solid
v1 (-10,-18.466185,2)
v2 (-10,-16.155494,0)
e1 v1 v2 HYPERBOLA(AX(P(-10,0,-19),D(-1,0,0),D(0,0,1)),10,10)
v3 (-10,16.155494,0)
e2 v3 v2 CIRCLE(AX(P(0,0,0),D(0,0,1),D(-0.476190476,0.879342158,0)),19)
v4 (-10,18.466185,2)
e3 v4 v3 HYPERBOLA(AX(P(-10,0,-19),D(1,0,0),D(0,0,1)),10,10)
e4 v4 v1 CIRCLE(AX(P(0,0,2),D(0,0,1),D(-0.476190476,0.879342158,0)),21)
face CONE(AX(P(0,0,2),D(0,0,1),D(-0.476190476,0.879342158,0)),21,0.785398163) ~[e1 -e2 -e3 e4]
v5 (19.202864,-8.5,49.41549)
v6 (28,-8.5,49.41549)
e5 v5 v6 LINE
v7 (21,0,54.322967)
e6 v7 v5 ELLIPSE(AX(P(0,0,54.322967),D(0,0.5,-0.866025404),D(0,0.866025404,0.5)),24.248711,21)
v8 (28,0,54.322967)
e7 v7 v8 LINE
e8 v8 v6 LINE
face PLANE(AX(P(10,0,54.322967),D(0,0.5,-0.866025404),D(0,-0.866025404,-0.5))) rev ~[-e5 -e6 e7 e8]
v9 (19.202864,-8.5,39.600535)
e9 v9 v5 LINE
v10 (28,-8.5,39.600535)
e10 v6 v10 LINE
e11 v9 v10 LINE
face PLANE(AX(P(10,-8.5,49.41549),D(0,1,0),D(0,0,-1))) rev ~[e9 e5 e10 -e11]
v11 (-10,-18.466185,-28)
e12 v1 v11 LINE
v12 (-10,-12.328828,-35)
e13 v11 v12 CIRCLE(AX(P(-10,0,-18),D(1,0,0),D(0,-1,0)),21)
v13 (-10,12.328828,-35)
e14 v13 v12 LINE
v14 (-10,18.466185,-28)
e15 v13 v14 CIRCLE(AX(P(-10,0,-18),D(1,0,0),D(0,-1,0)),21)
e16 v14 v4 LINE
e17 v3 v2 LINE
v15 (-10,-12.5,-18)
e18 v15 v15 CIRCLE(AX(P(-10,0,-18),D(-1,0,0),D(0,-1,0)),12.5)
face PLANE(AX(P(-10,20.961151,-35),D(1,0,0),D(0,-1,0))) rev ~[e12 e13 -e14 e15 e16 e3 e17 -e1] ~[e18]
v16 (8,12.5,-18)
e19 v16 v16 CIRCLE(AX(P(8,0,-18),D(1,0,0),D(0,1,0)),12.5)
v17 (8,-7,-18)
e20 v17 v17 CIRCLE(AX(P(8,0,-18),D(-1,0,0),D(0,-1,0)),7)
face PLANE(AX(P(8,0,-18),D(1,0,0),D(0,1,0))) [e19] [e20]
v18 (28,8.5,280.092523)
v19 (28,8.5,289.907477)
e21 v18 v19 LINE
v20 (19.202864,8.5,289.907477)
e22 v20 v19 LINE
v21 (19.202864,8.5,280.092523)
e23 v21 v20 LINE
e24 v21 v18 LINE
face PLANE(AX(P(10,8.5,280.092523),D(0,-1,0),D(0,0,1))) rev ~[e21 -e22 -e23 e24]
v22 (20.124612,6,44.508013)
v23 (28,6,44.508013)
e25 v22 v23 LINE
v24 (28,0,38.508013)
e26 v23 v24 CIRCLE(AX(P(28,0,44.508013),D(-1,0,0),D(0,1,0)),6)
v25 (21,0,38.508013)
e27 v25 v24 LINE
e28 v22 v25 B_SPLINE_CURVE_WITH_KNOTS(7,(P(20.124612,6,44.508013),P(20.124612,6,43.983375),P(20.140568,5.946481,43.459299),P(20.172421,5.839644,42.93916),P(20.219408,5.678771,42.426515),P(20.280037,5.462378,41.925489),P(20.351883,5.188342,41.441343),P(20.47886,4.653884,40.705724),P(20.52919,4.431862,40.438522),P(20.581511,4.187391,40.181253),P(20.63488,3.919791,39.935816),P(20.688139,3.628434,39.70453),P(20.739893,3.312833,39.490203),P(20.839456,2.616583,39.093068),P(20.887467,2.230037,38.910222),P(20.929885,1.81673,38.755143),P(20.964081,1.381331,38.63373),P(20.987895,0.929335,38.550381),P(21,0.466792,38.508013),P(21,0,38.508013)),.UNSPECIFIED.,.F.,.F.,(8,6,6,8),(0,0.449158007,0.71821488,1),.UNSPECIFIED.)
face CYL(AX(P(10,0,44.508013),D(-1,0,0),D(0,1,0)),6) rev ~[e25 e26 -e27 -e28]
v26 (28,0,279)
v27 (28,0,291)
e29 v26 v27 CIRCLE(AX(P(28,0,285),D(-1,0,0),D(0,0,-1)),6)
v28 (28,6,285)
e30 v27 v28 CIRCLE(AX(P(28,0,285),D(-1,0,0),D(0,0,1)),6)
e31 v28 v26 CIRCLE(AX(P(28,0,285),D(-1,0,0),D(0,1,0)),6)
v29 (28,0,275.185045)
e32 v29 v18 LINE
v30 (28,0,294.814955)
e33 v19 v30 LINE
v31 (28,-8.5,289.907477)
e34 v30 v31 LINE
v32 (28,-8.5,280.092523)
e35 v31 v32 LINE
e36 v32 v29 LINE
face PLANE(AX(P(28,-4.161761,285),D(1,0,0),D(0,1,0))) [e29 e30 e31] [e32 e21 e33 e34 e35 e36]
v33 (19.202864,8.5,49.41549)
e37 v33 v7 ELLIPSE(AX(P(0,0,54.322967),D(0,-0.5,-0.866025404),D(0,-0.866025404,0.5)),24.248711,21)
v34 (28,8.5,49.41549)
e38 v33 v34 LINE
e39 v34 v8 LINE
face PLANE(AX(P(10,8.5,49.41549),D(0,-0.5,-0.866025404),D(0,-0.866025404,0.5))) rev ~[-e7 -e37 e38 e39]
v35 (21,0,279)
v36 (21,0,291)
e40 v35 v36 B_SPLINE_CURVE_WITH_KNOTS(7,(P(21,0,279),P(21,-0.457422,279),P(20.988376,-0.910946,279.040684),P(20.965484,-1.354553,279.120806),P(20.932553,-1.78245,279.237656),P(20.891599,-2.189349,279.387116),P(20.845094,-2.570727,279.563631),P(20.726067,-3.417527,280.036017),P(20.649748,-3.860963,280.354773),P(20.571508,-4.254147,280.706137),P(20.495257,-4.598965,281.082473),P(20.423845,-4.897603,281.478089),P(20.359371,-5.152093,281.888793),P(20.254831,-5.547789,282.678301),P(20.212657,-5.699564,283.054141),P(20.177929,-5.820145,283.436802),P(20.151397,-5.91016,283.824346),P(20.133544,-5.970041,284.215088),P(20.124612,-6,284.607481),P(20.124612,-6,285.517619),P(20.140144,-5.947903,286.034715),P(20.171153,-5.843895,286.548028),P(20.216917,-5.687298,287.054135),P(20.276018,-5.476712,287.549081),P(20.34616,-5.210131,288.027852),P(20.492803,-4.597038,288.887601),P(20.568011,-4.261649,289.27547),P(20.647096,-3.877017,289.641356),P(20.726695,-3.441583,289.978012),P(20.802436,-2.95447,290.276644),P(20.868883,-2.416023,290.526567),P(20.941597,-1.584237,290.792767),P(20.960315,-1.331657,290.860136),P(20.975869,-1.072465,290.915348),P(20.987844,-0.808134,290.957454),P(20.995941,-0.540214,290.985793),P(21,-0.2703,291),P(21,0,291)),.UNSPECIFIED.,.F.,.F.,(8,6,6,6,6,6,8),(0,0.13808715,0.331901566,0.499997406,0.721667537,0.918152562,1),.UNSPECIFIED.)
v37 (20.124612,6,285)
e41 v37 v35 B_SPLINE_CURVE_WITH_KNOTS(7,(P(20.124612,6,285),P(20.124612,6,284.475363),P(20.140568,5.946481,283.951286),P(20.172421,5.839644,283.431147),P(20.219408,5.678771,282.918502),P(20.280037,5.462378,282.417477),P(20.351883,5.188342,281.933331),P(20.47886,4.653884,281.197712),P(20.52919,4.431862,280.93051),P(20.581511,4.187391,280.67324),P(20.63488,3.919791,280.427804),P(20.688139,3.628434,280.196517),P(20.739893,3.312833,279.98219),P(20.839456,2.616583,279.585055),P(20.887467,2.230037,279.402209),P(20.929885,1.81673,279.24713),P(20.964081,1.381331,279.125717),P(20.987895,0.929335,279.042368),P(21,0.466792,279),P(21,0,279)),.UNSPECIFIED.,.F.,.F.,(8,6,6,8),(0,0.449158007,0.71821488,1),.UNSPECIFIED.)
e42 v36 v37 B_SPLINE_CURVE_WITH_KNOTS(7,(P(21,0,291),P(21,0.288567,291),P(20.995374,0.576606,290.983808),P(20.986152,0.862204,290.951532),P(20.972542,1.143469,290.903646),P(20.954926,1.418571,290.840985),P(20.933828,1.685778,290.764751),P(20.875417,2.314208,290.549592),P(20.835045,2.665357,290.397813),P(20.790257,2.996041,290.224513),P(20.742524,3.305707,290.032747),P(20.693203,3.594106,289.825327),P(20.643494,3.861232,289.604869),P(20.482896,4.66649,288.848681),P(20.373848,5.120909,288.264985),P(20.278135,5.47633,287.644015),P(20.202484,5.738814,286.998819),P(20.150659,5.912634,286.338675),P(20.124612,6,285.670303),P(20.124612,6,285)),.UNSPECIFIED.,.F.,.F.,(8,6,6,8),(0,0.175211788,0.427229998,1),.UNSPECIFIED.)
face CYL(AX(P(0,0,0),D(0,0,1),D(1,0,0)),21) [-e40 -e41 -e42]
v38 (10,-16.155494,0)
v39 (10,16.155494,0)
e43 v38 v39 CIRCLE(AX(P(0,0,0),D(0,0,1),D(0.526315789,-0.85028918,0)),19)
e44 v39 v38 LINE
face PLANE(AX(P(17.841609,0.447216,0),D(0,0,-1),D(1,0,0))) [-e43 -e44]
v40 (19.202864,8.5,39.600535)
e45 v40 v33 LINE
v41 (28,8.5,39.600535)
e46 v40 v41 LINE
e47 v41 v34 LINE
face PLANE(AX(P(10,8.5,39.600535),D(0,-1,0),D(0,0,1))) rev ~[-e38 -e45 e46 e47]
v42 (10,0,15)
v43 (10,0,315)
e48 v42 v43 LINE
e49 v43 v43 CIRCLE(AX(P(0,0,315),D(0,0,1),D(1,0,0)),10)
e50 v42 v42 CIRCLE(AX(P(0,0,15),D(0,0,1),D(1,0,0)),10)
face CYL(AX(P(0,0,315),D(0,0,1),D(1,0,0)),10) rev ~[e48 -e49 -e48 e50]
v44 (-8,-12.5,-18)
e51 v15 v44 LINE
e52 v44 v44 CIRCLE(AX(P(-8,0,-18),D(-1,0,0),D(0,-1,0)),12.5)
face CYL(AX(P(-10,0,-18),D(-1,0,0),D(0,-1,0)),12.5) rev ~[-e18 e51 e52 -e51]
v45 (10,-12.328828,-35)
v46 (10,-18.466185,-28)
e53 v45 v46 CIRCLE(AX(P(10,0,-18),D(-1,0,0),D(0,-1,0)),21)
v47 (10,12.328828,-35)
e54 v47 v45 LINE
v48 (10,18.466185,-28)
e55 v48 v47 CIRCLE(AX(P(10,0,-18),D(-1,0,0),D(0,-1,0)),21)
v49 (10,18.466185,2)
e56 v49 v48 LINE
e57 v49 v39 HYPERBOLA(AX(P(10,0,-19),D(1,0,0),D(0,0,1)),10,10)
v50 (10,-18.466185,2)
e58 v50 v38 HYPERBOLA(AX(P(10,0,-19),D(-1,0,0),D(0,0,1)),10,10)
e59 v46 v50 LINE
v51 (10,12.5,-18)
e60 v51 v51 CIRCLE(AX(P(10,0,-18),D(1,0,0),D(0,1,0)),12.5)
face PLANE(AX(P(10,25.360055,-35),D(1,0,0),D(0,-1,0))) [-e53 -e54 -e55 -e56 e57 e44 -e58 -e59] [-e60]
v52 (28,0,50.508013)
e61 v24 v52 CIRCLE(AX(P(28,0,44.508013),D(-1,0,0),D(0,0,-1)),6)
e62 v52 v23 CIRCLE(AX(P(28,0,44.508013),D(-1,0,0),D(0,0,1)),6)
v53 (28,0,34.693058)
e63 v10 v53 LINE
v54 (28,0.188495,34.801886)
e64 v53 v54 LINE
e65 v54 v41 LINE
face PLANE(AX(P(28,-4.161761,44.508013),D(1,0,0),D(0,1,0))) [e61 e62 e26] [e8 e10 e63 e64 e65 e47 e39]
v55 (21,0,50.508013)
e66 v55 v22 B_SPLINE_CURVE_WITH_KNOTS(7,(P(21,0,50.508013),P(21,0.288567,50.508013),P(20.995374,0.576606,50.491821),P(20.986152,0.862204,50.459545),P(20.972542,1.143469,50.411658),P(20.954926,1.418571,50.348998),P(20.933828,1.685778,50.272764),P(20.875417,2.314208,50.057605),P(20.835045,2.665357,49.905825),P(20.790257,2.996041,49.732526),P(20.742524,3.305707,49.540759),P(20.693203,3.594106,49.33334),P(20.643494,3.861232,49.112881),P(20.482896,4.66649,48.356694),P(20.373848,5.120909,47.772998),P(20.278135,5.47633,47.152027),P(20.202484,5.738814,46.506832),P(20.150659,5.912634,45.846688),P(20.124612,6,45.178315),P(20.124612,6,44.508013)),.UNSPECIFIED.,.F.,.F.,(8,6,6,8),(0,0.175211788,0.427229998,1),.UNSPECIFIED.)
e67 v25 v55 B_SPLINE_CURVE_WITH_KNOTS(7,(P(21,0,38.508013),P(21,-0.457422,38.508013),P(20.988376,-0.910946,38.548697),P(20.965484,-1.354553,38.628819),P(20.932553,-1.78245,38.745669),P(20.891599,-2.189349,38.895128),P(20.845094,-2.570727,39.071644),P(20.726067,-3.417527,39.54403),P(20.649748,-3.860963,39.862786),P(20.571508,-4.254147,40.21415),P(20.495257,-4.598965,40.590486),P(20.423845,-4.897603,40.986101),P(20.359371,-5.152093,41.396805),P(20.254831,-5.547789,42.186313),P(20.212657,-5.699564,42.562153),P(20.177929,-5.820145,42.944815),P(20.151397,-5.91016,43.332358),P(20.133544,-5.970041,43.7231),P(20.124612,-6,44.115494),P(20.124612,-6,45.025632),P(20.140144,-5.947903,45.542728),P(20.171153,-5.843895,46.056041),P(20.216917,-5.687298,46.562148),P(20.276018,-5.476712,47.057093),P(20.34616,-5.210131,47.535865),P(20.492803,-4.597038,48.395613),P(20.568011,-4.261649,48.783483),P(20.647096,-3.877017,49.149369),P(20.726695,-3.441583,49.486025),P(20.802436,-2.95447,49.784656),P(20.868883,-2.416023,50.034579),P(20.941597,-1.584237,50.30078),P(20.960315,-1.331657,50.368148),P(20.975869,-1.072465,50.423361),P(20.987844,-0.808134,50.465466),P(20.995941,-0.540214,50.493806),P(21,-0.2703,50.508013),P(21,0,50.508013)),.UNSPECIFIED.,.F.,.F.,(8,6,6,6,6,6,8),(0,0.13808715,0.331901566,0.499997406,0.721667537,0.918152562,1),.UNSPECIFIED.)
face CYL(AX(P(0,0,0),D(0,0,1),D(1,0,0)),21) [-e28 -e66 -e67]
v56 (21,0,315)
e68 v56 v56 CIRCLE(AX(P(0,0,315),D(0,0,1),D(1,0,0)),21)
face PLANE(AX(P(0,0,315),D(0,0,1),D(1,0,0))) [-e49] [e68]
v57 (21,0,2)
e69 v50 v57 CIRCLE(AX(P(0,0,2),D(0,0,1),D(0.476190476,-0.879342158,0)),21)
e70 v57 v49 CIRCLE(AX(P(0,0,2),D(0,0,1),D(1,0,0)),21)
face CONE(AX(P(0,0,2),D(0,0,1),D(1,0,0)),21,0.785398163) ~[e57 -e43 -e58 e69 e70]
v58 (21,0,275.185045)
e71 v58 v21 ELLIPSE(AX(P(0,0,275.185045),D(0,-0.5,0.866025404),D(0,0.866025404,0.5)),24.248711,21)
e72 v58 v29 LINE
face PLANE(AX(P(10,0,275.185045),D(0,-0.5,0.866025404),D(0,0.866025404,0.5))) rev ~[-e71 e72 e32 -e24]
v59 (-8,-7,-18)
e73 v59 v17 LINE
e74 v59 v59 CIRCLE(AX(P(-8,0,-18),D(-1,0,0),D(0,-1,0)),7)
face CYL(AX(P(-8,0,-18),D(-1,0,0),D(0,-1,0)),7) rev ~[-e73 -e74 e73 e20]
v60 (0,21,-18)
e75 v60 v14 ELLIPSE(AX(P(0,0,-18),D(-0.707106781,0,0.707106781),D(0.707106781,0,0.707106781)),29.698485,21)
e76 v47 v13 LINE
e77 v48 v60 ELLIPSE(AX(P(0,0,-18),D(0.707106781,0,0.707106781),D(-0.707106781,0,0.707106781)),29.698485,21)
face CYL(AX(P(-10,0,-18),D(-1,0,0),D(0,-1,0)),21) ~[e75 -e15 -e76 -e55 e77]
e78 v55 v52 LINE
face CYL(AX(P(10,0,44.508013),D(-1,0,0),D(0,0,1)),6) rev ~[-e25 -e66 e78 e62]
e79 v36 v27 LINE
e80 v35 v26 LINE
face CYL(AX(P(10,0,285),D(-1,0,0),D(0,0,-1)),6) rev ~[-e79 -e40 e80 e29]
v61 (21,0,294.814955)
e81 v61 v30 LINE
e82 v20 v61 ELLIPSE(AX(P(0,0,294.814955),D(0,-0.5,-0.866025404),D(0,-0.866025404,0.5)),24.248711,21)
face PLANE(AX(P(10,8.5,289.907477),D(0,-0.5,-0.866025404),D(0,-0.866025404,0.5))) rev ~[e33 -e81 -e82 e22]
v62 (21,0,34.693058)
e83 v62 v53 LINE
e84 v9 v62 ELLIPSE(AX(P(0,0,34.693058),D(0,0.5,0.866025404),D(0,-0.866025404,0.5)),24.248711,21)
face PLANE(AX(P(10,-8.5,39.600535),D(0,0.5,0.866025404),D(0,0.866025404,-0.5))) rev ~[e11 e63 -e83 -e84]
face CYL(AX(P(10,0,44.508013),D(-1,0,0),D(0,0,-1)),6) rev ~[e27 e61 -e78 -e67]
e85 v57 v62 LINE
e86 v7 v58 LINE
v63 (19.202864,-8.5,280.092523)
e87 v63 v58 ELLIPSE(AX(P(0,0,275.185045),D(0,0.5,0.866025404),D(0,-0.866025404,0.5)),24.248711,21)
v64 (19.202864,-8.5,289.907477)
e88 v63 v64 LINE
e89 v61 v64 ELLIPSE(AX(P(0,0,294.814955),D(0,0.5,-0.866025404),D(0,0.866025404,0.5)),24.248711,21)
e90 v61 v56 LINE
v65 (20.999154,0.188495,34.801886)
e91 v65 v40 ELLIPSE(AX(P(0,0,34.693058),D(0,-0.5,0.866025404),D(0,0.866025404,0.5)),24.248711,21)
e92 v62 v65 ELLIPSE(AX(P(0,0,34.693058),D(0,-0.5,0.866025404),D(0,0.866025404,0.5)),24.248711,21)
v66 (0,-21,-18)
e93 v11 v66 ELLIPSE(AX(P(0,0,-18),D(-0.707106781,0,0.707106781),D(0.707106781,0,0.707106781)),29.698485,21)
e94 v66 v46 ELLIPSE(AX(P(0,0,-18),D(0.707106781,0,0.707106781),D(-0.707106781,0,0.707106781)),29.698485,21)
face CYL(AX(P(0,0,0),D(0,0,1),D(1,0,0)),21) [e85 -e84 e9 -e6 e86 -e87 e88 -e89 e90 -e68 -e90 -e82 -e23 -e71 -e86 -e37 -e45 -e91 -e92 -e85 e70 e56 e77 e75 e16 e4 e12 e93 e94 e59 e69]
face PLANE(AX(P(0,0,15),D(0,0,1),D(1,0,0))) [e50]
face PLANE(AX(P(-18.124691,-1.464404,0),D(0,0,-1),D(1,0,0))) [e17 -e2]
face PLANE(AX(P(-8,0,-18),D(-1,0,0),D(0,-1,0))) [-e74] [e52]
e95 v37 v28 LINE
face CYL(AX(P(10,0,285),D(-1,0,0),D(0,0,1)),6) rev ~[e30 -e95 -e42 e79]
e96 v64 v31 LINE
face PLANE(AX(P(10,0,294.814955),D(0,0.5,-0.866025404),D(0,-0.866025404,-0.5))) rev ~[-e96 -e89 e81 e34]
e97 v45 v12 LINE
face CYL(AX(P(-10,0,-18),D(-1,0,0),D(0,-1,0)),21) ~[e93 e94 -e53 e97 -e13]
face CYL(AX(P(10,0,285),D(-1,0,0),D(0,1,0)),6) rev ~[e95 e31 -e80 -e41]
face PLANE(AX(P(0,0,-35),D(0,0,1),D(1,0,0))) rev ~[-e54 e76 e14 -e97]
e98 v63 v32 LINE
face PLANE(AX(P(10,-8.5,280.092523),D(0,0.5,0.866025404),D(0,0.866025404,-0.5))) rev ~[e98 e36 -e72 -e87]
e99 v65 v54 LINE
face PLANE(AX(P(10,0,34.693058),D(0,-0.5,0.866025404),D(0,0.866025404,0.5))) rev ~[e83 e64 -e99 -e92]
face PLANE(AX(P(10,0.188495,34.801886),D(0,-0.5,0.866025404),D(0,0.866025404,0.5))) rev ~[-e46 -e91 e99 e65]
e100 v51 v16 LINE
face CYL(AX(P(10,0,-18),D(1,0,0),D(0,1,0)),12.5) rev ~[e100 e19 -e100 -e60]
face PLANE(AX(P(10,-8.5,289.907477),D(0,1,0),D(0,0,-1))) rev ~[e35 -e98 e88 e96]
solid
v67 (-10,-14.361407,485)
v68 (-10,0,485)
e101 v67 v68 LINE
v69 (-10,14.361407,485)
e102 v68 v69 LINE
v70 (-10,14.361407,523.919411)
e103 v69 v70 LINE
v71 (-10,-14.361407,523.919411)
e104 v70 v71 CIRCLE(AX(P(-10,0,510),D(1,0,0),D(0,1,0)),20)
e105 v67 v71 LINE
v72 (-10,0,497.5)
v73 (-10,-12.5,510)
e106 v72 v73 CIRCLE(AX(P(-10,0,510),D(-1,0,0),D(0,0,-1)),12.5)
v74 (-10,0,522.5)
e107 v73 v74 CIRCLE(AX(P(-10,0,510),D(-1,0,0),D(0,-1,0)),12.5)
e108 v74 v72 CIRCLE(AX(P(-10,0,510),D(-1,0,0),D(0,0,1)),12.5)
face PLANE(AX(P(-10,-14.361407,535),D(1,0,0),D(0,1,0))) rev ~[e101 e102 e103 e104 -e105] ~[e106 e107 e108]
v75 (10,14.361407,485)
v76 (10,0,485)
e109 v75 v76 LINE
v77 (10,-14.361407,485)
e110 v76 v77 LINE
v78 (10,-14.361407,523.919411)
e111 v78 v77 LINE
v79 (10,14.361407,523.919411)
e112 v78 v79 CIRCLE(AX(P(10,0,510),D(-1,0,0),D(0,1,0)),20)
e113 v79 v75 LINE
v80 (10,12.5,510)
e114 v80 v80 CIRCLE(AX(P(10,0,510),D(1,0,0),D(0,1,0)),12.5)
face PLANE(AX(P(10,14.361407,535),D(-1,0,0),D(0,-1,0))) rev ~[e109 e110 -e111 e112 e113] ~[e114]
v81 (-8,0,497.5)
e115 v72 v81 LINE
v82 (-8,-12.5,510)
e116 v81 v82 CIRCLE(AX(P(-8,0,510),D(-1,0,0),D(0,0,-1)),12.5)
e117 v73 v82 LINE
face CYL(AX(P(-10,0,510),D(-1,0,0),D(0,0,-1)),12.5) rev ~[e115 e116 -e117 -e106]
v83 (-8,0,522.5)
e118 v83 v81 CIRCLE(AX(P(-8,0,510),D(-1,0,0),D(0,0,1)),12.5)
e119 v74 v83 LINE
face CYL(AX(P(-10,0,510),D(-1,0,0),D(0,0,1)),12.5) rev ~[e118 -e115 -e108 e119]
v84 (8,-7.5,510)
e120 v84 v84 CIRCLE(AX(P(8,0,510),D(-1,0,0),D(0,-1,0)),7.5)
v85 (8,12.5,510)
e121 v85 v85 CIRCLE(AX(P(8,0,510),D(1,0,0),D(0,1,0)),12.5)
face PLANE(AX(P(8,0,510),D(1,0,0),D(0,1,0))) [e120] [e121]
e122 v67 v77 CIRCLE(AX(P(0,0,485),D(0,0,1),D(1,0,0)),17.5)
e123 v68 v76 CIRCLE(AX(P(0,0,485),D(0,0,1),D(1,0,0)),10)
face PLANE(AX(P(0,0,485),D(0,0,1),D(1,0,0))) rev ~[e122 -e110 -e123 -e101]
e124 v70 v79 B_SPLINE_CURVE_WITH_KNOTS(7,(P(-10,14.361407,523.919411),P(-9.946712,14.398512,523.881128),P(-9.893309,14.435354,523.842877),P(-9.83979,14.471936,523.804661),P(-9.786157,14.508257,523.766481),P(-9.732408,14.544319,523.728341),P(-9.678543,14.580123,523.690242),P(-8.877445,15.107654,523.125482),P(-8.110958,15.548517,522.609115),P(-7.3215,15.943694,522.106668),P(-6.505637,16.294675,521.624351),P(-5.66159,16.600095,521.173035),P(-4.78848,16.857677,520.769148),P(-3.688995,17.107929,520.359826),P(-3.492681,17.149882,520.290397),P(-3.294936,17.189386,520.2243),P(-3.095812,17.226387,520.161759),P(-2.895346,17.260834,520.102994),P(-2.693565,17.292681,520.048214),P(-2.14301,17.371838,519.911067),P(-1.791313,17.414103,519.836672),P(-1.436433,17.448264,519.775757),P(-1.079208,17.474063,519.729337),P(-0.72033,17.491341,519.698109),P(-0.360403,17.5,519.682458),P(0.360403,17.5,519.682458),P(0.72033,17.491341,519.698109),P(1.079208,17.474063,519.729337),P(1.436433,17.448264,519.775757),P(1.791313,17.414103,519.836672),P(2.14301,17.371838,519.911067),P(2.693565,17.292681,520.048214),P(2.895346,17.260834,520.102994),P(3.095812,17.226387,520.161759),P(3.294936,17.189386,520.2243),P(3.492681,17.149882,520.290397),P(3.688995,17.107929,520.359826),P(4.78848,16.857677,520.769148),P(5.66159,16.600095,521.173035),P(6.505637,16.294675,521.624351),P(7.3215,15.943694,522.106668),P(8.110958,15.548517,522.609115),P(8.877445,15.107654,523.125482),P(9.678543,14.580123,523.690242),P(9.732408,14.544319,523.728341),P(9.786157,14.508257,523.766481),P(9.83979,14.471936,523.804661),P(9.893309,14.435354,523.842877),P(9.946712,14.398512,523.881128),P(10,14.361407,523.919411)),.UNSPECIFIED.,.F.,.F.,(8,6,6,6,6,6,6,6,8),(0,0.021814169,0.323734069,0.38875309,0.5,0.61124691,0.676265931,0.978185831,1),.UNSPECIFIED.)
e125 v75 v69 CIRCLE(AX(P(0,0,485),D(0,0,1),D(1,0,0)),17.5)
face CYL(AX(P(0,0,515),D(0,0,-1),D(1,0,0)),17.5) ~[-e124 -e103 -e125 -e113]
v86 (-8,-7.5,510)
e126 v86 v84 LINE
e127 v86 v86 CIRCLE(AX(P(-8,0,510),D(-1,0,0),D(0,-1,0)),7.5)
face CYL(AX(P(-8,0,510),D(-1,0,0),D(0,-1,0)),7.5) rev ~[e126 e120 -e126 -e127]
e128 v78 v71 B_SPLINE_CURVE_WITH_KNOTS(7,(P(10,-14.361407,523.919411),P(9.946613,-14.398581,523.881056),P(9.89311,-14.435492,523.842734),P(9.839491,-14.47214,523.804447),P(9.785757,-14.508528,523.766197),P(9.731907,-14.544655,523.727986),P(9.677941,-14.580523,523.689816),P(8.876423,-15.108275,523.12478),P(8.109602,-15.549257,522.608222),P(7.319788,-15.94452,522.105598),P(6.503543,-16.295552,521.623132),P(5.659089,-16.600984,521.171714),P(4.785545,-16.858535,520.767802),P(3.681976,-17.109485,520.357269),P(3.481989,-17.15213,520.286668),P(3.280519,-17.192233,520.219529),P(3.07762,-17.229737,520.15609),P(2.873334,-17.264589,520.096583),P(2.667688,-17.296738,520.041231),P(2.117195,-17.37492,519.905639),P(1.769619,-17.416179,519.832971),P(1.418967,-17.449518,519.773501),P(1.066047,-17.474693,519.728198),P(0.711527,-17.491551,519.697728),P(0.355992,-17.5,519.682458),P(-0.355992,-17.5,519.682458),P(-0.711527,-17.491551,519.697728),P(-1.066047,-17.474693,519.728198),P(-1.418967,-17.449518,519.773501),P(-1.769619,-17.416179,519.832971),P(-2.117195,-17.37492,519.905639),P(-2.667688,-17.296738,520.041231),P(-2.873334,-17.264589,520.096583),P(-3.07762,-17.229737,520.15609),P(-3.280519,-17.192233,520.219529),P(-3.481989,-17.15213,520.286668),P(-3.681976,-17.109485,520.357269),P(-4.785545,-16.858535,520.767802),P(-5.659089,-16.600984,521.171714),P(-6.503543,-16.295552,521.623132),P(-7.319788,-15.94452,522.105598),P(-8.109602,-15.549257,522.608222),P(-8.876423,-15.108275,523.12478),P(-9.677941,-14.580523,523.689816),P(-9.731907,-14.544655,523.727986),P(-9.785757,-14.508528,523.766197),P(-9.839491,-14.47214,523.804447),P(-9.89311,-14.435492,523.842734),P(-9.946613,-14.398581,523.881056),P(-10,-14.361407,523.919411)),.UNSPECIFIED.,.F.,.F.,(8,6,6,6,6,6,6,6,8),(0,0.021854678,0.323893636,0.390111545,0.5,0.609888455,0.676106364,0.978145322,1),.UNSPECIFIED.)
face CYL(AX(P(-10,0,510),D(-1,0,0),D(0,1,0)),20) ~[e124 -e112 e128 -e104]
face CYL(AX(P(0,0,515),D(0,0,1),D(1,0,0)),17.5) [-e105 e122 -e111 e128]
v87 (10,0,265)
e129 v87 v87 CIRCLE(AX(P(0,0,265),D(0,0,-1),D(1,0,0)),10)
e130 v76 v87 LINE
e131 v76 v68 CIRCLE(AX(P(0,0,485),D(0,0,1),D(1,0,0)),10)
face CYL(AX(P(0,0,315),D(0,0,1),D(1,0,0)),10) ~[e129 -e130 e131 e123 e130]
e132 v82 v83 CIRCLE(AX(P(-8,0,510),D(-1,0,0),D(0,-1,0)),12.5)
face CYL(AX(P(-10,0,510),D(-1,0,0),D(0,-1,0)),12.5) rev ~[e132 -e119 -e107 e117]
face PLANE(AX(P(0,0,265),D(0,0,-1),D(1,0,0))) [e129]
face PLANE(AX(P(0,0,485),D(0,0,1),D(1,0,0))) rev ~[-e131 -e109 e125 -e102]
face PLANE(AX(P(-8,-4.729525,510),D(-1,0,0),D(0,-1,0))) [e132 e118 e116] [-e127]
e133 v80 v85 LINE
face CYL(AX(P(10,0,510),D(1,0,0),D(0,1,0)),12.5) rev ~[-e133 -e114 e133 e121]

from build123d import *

# Parameters (mm, degrees)
F0_R      = 21
F1_DEPTH  = 315
F2_R      = 10
F3_DEPTH  = 300
F4_R      = 21
F5_DEPTH  = 35
F6_W      = 15.6832183711
F6_H      = 49.8256795108
F6_W_2    = 16.2493828684
F6_H_2    = 44.8511093855
F7_DEPTH  = 35
F8_R      = 12.5
F9_DEPTH  = 2
F10_R     = 7
F11_DEPTH = 25
F12_R     = 12.5
F13_DEPTH = 2
F15_DEPTH = 25
F16_SIZE  = 2
F17_R     = 10
F18_DEPTH = 200
F19_R     = 10
F20_DEPTH = 50
F21_R     = 17.5
F21_R_2   = 10
F22_DEPTH = 30
F23_R     = 17.5
F24_DEPTH = 20
F26_DEPTH = 60
F28_DEPTH = 2
F29_R     = 7.5
F30_DEPTH = 25
F31_R     = 12.5
F31_R_2   = 7.5
F32_DEPTH = 2
F34_DEPTH = 25
F36_DEPTH = 18


with BuildPart() as f1:
    # F0 (on Top) → F1 (new body)
    with BuildSketch(Plane.XY):
        Circle(F0_R)
    extrude(amount=F1_DEPTH)

    # F2 (on face) → F3 (cut)
    with BuildSketch(Plane.XY.offset(315)):
        Circle(F2_R)
    extrude(amount=-F3_DEPTH, mode=Mode.SUBTRACT)

    # F4 (on face) → F5 (join)
    with BuildSketch(Plane.XY):
        Circle(F4_R)
    extrude(amount=-F5_DEPTH)

    # F6 (on face) → F7 (cut)
    with BuildSketch(Plane(origin=(0, 0, -35), x_dir=(1, 0, 0), z_dir=(0, 0, -1))):
        with Locations((17.8416091856, -0.4472155124)):
            Rectangle(F6_W, F6_H)
        with Locations((-18.1246914342, 1.4644041657)):
            Rectangle(F6_W_2, F6_H_2)
    extrude(amount=-F7_DEPTH, mode=Mode.SUBTRACT)

    # F8 (on face) → F9 (cut)
    with BuildSketch(Plane(origin=(-10, 0, 0), x_dir=(0, -1, 0), z_dir=(-1, 0, 0))):
        with Locations((0, -18)):
            Circle(F8_R)
    extrude(amount=-F9_DEPTH, mode=Mode.SUBTRACT)

    # F10 (on face) → F11 (cut)
    with BuildSketch(Plane(origin=(-8, 0, 0), x_dir=(0, -1, 0), z_dir=(-1, 0, 0))):
        with Locations((0, -18)):
            Circle(F10_R)
    extrude(amount=-F11_DEPTH, mode=Mode.SUBTRACT)

    # F12 (on face) → F13 (cut)
    with BuildSketch(Plane.YZ.offset(10)):
        with Locations((0, -18)):
            Circle(F12_R)
    extrude(amount=-F13_DEPTH, mode=Mode.SUBTRACT)

    # F14 (on face) → F15 (cut)
    with BuildSketch(Plane(origin=(-10, 0, 0), x_dir=(0, -1, 0), z_dir=(-1, 0, 0))):
        with BuildLine():
            ThreePointArc((21, -18), (0, -39), (-21, -18))
            Line((-21, -18), (-30, -18))
            ThreePointArc((-30, -18), (0, -48), (30, -18))
            Line((30, -18), (21, -18))
        make_face()
    extrude(amount=-F15_DEPTH, mode=Mode.SUBTRACT)

    # F16
    f16_edges = [f1.edges().sort_by_distance(p)[0] for p in [
        (18.041619, 10.747093, 0),
        (18.041619, -10.747093, 0),
        (-21, 0, 0),
    ]]
    chamfer(f16_edges, length=F16_SIZE)

    # F35 (on face) → F36 (join)
    with BuildSketch(Plane.YZ.offset(10)):
        with BuildLine():
            Line((0, 50.508012673), (0, 54.3229672492))
            Line((0, 54.3229672492), (-8.5, 49.4154899611))
            Line((-8.5, 49.4154899611), (-8.5, 39.6005353849))
            Line((-8.5, 39.6005353849), (0, 34.6930580967))
            Line((0, 34.6930580967), (0, 38.508012673))
            ThreePointArc((0, 38.508012673), (-6, 44.508012673), (0, 50.508012673))
        make_face()
        with BuildLine():
            Line((-8.5, 280.0925227119), (0, 275.1850454238))
            Line((0, 275.1850454238), (0, 279))
            ThreePointArc((0, 279), (-6, 285), (0, 291))
            Line((0, 291), (0, 294.8149545762))
            Line((0, 294.8149545762), (-8.5, 289.9074772881))
            Line((-8.5, 289.9074772881), (-8.5, 280.0925227119))
        make_face()
        with BuildLine():
            Line((0, 279), (0, 275.1850454238))
            Line((0, 275.1850454238), (8.5, 280.0925227119))
            Line((8.5, 280.0925227119), (8.5, 289.9074772881))
            Line((8.5, 289.9074772881), (0, 294.8149545762))
            Line((0, 294.8149545762), (0, 291))
            ThreePointArc((0, 291), (4.2426406871, 289.2426406871), (6, 285))
            ThreePointArc((6, 285), (4.2426406871, 280.7573593129), (0, 279))
        make_face()
        with BuildLine():
            Line((8.5, 49.4154899611), (0, 54.3229672492))
            Line((0, 54.3229672492), (0, 50.508012673))
            ThreePointArc((0, 50.508012673), (4.2426406871, 48.7506533601), (6, 44.508012673))
            ThreePointArc((6, 44.508012673), (4.2426406871, 40.2653719858), (0, 38.508012673))
            Line((0, 38.508012673), (0, 34.6930580967))
            Line((0, 34.6930580967), (0.1884949477, 34.8018857055))
            Line((0.1884949477, 34.8018857055), (8.5, 39.6005353849))
            Line((8.5, 39.6005353849), (8.5, 49.4154899611))
        make_face()
    extrude(amount=F36_DEPTH)


with BuildPart() as f18:
    # F17 (on face) → F18 (new body)
    with BuildSketch(Plane.XY.offset(315)):
        Circle(F17_R)
    extrude(amount=F18_DEPTH)

    # F19 (on face) → F20 (join)
    with BuildSketch(Plane(origin=(0, 0, 315), x_dir=(1, 0, 0), z_dir=(0, 0, -1))):
        Circle(F19_R)
    extrude(amount=F20_DEPTH)

    # F21 (on face) → F22 (join)
    with BuildSketch(Plane.XY.offset(515)):
        Circle(F21_R)
        Circle(F21_R_2, mode=Mode.SUBTRACT)
        Circle(F21_R_2)
    extrude(amount=-F22_DEPTH)

    # F23 (on face) → F24 (join)
    with BuildSketch(Plane.XY.offset(515)):
        Circle(F23_R)
    extrude(amount=F24_DEPTH)

    # F25 (on face) → F26 (cut)
    with BuildSketch(Plane.XY.offset(535)):
        with BuildLine():
            ThreePointArc((-10, 14.3614066163), (-17.5, 0), (-10, -14.3614066163))
            Line((-10, -14.3614066163), (-10, 14.3614066163))
        make_face()
        with BuildLine():
            ThreePointArc((17.5, 0), (15.5120920575, 8.100925873), (10, 14.3614066163))
            Line((10, 14.3614066163), (10, -14.3614066163))
            ThreePointArc((10, -14.3614066163), (15.5120920575, -8.100925873), (17.5, 0))
        make_face()
    extrude(amount=-F26_DEPTH, mode=Mode.SUBTRACT)

    # F27 (on face) → F28 (cut)
    with BuildSketch(Plane(origin=(-10, 0, 0), x_dir=(0, -1, 0), z_dir=(-1, 0, 0))):
        with BuildLine():
            ThreePointArc((12.5, 510), (8.8388347648, 518.8388347648), (0, 522.5))
            Line((0, 522.5), (0, 497.5))
            ThreePointArc((0, 497.5), (8.8388347648, 501.1611652352), (12.5, 510))
        make_face()
        with BuildLine():
            Line((0, 497.5), (0, 522.5))
            ThreePointArc((0, 522.5), (-12.5, 510), (0, 497.5))
        make_face()
    extrude(amount=-F28_DEPTH, mode=Mode.SUBTRACT)

    # F29 (on face) → F30 (cut)
    with BuildSketch(Plane(origin=(-8, 0, 0), x_dir=(0, -1, 0), z_dir=(-1, 0, 0))):
        with Locations((0, 510)):
            Circle(F29_R)
    extrude(amount=-F30_DEPTH, mode=Mode.SUBTRACT)

    # F31 (on face) → F32 (cut)
    with BuildSketch(Plane.YZ.offset(10)):
        with Locations((0, 510)):
            Circle(F31_R)
        with Locations((0, 510)):
            Circle(F31_R_2, mode=Mode.SUBTRACT)
        with Locations((0, 510)):
            Circle(F31_R)
    extrude(amount=-F32_DEPTH, mode=Mode.SUBTRACT)

    # F33 (on face) → F34 (cut)
    with BuildSketch(Plane(origin=(-10, 0, 0), x_dir=(0, -1, 0), z_dir=(-1, 0, 0))):
        with BuildLine():
            ThreePointArc((-20, 510), (0, 530), (20, 510))
            Line((20, 510), (33.9818404813, 510))
            ThreePointArc((33.9818404813, 510), (0, 543.9818404813), (-33.9818404813, 510))
            Line((-33.9818404813, 510), (-20, 510))
        make_face()
    extrude(amount=-F34_DEPTH, mode=Mode.SUBTRACT)


solid = Compound([f1.part, f18.part])
